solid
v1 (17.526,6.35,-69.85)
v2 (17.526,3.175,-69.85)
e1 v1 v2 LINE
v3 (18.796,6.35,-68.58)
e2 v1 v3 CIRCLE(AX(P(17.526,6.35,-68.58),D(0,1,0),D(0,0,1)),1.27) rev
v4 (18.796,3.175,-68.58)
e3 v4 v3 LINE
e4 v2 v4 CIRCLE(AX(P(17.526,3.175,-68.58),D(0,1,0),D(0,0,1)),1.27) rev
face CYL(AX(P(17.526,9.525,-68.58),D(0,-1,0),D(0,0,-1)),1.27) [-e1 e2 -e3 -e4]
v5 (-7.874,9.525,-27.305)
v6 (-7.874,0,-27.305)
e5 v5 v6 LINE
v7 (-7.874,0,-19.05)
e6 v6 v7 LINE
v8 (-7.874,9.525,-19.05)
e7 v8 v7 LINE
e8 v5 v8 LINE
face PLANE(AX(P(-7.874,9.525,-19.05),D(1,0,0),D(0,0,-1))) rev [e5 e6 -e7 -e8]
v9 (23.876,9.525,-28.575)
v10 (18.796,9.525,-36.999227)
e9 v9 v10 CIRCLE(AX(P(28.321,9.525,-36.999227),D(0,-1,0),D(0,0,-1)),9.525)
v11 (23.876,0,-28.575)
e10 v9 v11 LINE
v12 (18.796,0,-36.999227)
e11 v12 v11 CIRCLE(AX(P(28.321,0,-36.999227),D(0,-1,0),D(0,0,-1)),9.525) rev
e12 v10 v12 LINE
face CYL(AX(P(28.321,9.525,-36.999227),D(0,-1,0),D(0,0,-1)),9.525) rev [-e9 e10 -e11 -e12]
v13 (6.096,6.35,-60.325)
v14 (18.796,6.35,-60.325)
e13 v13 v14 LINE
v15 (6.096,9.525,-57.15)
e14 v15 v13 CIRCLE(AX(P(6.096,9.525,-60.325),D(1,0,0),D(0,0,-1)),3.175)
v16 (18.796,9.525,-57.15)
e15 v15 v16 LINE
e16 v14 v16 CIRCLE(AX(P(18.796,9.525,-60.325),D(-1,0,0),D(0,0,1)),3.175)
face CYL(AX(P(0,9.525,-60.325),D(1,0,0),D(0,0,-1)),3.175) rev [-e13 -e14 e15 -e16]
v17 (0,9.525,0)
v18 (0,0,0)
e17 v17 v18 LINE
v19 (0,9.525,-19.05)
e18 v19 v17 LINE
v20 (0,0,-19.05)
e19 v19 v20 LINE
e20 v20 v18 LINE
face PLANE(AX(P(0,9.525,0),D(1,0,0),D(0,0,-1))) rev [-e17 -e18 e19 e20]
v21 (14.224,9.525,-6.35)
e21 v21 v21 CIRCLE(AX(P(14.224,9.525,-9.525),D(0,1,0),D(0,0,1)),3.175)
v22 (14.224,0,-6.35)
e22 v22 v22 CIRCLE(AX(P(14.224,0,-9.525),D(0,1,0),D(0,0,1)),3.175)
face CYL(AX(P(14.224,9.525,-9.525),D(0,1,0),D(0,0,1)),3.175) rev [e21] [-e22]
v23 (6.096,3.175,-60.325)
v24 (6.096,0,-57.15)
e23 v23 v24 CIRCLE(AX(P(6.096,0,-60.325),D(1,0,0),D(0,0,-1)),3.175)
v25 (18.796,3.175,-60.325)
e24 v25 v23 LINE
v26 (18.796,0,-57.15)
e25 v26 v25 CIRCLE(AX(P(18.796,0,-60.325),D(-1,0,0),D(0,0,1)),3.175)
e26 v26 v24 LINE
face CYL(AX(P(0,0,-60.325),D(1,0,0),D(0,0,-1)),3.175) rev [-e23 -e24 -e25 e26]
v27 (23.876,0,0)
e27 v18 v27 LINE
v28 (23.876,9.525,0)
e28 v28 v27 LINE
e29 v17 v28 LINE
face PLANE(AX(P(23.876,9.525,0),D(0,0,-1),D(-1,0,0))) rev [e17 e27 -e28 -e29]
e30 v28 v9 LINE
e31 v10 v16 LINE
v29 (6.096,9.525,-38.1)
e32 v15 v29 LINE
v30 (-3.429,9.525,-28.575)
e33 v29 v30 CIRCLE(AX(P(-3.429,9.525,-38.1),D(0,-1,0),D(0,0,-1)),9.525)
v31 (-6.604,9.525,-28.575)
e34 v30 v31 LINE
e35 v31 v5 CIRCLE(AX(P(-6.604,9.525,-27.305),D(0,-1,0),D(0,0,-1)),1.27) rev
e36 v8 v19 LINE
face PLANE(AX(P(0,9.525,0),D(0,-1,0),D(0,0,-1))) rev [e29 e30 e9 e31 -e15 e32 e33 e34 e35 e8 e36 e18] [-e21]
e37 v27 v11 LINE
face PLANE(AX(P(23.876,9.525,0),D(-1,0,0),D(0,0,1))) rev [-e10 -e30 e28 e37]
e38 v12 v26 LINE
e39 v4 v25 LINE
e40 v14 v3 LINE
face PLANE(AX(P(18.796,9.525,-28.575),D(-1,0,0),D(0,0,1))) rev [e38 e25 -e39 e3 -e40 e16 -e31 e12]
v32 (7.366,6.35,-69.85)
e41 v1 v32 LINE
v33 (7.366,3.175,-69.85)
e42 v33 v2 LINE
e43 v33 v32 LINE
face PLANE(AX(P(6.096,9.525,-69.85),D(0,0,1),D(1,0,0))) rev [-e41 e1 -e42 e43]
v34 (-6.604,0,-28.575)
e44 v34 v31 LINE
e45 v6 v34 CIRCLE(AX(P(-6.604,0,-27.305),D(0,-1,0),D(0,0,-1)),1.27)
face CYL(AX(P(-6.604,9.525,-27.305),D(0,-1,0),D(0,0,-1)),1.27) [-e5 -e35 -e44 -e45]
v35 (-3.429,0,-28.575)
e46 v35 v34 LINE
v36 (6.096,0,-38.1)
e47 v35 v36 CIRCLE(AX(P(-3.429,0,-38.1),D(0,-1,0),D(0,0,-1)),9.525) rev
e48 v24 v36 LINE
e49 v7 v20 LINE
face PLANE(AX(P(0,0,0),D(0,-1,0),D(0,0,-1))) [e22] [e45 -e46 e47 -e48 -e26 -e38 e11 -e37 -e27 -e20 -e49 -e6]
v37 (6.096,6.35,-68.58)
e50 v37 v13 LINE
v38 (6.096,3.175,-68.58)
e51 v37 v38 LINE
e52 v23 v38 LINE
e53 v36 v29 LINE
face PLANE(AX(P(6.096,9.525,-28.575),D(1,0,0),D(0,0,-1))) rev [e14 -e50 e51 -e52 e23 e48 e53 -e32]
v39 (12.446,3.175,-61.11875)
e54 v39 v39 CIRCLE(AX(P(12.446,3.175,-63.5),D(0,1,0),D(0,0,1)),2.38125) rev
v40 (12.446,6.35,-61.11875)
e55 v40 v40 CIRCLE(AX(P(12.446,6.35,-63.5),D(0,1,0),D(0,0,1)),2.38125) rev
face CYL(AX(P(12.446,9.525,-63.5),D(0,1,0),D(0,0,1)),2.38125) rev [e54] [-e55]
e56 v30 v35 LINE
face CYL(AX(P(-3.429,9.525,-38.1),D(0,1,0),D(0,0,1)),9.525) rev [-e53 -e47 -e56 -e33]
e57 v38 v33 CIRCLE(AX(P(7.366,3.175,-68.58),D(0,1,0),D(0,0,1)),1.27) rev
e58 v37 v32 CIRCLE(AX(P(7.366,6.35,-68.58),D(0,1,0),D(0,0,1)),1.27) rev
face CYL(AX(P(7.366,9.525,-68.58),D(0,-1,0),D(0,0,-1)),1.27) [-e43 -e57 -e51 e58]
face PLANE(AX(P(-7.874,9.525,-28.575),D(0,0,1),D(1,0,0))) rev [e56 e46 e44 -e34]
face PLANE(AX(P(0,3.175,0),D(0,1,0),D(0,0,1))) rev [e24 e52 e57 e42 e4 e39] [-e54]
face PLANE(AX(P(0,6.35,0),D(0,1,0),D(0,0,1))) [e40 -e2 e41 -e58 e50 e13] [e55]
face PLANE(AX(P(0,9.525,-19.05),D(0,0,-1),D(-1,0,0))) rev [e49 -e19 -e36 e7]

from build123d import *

# Parameters (mm, degrees)
STOCK_DEPTH        = 9.525
MOUNTING_HOLE_D    = 6.35
SPRING_HOLE_D      = 4.7625
FILLET3_R          = 9.525
FILLET4_R          = 1.27
SKETCH15_W         = 12.7
SKETCH15_H         = 12.7
CUT_EXTRUDE1_DEPTH = 3.175
SKETCH16_W         = 12.7
SKETCH16_H         = 12.7
CUT_EXTRUDE2_DEPTH = 3.175
FILLET5_R          = 3.175


# Some blends are built 0.0001 mm under size
with BuildPart() as part:
    # Sketch7 → Stock (new body)
    with BuildSketch(Plane(origin=(0, 0, 0), x_dir=(1, 0, 0), z_dir=(0, 1, 0))):
        Polygon((0, 0), (0, 19.05), (-7.874, 19.05), (-7.874, 28.575), (6.096, 28.575), (6.096, 69.85), (18.796, 69.85), (18.796, 28.575), (23.876, 28.575), (23.876, 0), align=None)
    extrude(amount=STOCK_DEPTH)

    # Mounting Hole (through all)
    with Locations(Plane(origin=(0, 9.525, 0), x_dir=(1, 0, 0), z_dir=(0, 1, 0))):
        with Locations((14.224, 9.525)):
            Hole(MOUNTING_HOLE_D / 2)

    # Spring Hole (through all)
    with Locations(Plane(origin=(0, 9.525, 0), x_dir=(1, 0, 0), z_dir=(0, 1, 0))):
        with Locations((12.446, 63.5)):
            Hole(SPRING_HOLE_D / 2)

    # Fillet3
    # the kernel refuses this fillet: 9.525 mm, written as the material it adds along each edge
    with BuildSketch(Plane(origin=(6.096, 0, -28.575), x_dir=(-1, 0, 0), z_dir=(0, 1, 0))) as fillet3_piece_1:
        with BuildLine():
            CenterArc((FILLET3_R, -FILLET3_R), FILLET3_R, 90, 90)
            Line((0, -FILLET3_R), (-FILLET3_R * 0.02, -FILLET3_R))
            Line((-FILLET3_R * 0.02, -FILLET3_R), (-FILLET3_R * 0.02, FILLET3_R * 0.02))
            Line((-FILLET3_R * 0.02, FILLET3_R * 0.02), (FILLET3_R, FILLET3_R * 0.02))
            Line((FILLET3_R, FILLET3_R * 0.02), (FILLET3_R, 0))
        make_face()
    extrude(amount=9.525)
    with BuildSketch(Plane(origin=(18.796, 0, -28.575), x_dir=(1, 0, 0), z_dir=(0, 1, 0))) as fillet3_piece_2:
        with BuildLine():
            CenterArc((9.525, 8.424226968), FILLET3_R, 180, 62.181860715)
            Line((0, 8.424226968), (-0.1905, 8.424226968))
            Line((-0.1905, 8.424226968), (-0.1905, 0))
            Line((-0.1905, 0), (0, -0.1905))
            ThreePointArc((0, -0.1905), (2.54, -0.1905), (4.9911, -0.168484539))
            Line((4.9911, -0.168484539), (5.08, 0))
        make_face()
    extrude(amount=9.525)

    # Fillet4
    fillet4_edges = [part.edges().sort_by_distance(p)[0] for p in [
        (-7.874, 4.7625, -28.575),
        (6.096, 4.7625, -69.85),
        (18.796, 4.7625, -69.85),
    ]]
    fillet(fillet4_edges, radius=FILLET4_R)

    # Sketch15 → Cut-Extrude1 (cut)
    with BuildSketch(Plane(origin=(0, 9.525, 0), x_dir=(1, 0, 0), z_dir=(0, 1, 0))):
        with Locations((12.446, 63.5)):
            Rectangle(SKETCH15_W, SKETCH15_H)
    extrude(amount=-CUT_EXTRUDE1_DEPTH, mode=Mode.SUBTRACT)

    # Sketch16 → Cut-Extrude2 (cut)
    with BuildSketch(Plane.XZ):
        with Locations((12.446, -63.5)):
            Rectangle(SKETCH16_W, SKETCH16_H)
    extrude(amount=-CUT_EXTRUDE2_DEPTH, mode=Mode.SUBTRACT)

    # Fillet5
    fillet5_edges = [part.edges().sort_by_distance(p)[0] for p in [
        (12.446, 3.175, -57.15),
        (12.446, 6.35, -57.15),
    ]]
    fillet(fillet5_edges, radius=FILLET5_R - 0.0001)  # a hair under: the kernel refuses the full size


solid = part.part
